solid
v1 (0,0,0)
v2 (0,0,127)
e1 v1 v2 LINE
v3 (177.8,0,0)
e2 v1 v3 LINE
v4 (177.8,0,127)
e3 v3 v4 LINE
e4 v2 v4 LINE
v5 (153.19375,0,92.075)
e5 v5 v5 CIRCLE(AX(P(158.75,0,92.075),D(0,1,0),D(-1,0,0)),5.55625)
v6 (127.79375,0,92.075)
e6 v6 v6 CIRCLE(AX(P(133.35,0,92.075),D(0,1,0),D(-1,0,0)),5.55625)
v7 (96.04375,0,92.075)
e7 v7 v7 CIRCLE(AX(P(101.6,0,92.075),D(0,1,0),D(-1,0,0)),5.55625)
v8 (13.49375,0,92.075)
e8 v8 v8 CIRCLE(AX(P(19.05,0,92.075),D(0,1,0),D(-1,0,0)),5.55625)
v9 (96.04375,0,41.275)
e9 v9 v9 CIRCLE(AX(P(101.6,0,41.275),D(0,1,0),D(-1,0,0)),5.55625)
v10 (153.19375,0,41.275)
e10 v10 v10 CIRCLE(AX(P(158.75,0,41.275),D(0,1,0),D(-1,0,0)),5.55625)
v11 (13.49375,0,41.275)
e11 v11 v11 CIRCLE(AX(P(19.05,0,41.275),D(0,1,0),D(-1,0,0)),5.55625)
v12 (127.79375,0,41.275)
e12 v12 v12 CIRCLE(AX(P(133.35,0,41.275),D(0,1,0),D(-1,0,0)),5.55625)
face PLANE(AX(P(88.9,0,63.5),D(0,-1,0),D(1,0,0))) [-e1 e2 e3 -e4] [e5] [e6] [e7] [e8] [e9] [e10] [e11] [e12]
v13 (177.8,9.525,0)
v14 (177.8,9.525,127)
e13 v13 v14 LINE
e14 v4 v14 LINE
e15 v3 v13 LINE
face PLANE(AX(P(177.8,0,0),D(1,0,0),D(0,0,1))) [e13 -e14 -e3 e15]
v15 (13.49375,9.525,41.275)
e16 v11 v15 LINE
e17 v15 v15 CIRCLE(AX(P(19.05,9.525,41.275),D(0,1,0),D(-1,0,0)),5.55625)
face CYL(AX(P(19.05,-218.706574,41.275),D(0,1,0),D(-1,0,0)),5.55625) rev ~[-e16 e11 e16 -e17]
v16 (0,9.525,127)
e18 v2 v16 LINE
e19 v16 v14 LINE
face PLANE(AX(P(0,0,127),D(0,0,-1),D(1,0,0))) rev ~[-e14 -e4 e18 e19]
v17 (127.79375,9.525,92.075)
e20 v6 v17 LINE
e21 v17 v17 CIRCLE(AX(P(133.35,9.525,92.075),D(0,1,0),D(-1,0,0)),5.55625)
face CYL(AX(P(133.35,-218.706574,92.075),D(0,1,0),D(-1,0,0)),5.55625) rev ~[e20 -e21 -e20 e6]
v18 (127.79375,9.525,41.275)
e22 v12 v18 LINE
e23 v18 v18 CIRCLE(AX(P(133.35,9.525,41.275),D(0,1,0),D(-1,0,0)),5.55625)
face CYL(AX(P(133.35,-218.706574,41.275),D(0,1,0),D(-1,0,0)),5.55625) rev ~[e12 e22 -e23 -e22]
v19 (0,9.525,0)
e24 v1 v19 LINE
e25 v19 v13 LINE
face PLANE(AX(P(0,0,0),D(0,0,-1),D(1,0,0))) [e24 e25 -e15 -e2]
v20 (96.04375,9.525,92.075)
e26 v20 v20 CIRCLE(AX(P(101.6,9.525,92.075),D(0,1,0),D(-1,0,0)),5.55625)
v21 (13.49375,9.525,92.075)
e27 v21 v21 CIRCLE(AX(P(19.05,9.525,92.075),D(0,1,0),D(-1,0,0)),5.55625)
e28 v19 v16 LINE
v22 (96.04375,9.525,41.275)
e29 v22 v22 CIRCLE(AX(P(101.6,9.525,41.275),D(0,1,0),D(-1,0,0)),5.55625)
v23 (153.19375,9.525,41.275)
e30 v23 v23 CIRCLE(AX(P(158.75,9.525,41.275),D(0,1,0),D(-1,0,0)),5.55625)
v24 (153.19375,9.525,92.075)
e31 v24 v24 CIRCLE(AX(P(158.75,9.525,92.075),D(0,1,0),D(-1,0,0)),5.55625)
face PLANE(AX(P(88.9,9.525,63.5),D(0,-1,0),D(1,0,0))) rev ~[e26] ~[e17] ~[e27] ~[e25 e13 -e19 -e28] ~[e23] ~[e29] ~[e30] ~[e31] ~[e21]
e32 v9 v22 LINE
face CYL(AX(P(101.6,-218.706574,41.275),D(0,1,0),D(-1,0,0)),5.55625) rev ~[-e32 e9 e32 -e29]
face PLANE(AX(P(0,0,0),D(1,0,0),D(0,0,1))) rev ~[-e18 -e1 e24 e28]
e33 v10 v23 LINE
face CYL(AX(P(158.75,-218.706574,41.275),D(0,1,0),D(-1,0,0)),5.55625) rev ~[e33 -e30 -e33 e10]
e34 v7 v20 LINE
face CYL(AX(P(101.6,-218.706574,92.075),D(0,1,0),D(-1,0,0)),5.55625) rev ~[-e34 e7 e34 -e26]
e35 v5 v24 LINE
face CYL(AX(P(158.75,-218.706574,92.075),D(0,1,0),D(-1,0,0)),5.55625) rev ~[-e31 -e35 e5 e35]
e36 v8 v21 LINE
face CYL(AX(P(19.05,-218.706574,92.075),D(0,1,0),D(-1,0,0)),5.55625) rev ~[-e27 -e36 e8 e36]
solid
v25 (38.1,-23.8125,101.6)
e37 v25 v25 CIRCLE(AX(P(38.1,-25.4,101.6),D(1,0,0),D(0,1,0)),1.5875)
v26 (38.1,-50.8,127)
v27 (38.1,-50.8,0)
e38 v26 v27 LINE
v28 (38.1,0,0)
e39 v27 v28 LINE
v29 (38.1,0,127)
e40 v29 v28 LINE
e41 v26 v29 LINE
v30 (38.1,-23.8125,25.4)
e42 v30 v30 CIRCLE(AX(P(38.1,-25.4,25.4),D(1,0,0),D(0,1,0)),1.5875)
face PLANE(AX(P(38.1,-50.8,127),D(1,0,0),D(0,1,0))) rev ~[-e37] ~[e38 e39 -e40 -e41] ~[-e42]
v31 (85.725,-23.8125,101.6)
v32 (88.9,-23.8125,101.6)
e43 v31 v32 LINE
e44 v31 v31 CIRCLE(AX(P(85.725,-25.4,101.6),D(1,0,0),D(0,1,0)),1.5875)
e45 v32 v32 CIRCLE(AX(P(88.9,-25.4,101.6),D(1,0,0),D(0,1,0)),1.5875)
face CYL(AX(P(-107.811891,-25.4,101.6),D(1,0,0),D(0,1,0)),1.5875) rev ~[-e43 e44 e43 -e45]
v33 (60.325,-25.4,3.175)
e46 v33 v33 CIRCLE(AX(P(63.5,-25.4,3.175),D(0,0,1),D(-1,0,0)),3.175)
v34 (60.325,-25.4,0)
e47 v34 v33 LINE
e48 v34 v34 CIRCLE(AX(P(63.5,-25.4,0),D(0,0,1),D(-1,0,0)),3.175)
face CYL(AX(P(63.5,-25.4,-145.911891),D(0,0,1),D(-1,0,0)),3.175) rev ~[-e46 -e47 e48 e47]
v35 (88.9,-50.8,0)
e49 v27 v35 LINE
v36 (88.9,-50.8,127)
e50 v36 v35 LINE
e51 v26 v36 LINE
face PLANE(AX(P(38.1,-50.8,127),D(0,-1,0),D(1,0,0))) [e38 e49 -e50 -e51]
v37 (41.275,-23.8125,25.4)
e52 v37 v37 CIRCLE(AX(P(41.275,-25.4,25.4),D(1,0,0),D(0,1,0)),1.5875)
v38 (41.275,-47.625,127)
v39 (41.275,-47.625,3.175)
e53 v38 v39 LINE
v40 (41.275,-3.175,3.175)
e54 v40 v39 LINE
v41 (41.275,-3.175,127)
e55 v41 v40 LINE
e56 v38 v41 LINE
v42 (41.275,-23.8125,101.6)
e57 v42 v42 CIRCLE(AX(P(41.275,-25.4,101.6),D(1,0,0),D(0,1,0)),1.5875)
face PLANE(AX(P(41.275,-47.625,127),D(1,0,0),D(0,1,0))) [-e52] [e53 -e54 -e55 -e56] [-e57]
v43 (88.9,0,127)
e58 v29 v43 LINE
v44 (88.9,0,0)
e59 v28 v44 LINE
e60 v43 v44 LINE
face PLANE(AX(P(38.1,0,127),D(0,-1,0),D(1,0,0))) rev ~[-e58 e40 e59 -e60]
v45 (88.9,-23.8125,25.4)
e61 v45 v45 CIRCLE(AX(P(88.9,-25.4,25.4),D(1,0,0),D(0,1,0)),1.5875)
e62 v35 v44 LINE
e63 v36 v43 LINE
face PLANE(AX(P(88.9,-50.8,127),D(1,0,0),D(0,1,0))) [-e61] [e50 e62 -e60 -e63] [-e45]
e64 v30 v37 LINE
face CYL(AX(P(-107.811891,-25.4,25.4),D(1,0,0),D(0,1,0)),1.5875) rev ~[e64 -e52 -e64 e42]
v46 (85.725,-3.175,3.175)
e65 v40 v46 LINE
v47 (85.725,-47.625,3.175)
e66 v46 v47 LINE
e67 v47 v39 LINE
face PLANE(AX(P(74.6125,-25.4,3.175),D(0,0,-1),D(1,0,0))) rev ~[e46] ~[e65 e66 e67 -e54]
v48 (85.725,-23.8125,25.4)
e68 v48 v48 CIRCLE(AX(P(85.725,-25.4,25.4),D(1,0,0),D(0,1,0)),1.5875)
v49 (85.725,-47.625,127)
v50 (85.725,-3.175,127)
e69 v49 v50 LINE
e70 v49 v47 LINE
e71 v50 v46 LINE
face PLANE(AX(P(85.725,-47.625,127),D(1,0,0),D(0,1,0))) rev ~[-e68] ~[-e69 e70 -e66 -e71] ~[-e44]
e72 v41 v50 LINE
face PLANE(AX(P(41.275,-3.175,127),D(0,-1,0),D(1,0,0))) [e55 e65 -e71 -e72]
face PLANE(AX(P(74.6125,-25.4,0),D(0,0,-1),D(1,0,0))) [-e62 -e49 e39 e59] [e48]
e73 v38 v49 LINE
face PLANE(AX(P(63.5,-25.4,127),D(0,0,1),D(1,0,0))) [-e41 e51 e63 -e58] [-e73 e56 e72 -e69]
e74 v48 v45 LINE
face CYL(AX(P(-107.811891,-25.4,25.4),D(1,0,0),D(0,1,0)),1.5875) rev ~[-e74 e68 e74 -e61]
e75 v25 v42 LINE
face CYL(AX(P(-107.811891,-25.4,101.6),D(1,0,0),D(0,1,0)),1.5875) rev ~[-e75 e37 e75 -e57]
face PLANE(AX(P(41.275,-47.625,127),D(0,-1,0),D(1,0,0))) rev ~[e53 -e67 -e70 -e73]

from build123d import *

# Parameters (mm, degrees)
F0_W     = 177.8
F0_H     = 127
F1_DEPTH = 9.525
F3_D     = 11.1125
F4_W     = 50.8
F4_H     = 50.8
F4_W_2   = 44.45
F4_H_2   = 44.45
F5_DEPTH = 127
F7_D     = 3.175
F8_W     = 22.225
F8_H     = 44.45
F9_DEPTH = 3.175
F10_D    = 6.35


# Not quite as in the source:
# - a feature names something its author has since deleted; it is built from what else it names


with BuildPart() as f1:
    # F0 (on Front) → F1 (new body)
    with BuildSketch(Plane.XZ):
        with Locations((88.9, 63.5)):
            Rectangle(F0_W, F0_H)
    extrude(amount=-F1_DEPTH)

    # F3 (through all)
    with Locations(Plane.XZ):
        with Locations((101.6, 92.075), (133.35, 92.075), (158.75, 92.075), (158.75, 41.275), (133.35, 41.275), (101.6, 41.275), (19.05, 92.075), (19.05, 41.275)):
            Hole(F3_D / 2)


with BuildPart() as f5:
    # F4 (on face) → F5 (new body)
    with BuildSketch(Plane.XY.offset(127)):
        with Locations((63.5, -25.4)):
            Rectangle(F4_W, F4_H)
        with Locations((63.5, -25.4)):
            Rectangle(F4_W_2, F4_H_2, mode=Mode.SUBTRACT)
    extrude(amount=-F5_DEPTH)

    # F7 (through all)
    with Locations(Plane(origin=(38.1, 0, 0), x_dir=(0, -1, 0), z_dir=(-1, 0, 0))):
        with Locations((25.4, 101.6), (25.4, 25.4)):
            Hole(F7_D / 2)

    # F8 (on face) → F9 (join)
    with BuildSketch(Plane(origin=(0, 0, 0), x_dir=(1, 0, 0), z_dir=(0, 0, -1))):
        with Locations((74.6125, 25.4)):
            Rectangle(F8_W, F8_H)
        with Locations((52.3875, 25.4)):
            Rectangle(F8_W, F8_H)
    extrude(amount=-F9_DEPTH)

    # F10 (through all)
    with Locations(Plane(origin=(0, 0, 0), x_dir=(1, 0, 0), z_dir=(0, 0, -1))):
        with Locations((63.5, 25.4)):
            Hole(F10_D / 2)


solid = Compound([f1.part, f5.part])
